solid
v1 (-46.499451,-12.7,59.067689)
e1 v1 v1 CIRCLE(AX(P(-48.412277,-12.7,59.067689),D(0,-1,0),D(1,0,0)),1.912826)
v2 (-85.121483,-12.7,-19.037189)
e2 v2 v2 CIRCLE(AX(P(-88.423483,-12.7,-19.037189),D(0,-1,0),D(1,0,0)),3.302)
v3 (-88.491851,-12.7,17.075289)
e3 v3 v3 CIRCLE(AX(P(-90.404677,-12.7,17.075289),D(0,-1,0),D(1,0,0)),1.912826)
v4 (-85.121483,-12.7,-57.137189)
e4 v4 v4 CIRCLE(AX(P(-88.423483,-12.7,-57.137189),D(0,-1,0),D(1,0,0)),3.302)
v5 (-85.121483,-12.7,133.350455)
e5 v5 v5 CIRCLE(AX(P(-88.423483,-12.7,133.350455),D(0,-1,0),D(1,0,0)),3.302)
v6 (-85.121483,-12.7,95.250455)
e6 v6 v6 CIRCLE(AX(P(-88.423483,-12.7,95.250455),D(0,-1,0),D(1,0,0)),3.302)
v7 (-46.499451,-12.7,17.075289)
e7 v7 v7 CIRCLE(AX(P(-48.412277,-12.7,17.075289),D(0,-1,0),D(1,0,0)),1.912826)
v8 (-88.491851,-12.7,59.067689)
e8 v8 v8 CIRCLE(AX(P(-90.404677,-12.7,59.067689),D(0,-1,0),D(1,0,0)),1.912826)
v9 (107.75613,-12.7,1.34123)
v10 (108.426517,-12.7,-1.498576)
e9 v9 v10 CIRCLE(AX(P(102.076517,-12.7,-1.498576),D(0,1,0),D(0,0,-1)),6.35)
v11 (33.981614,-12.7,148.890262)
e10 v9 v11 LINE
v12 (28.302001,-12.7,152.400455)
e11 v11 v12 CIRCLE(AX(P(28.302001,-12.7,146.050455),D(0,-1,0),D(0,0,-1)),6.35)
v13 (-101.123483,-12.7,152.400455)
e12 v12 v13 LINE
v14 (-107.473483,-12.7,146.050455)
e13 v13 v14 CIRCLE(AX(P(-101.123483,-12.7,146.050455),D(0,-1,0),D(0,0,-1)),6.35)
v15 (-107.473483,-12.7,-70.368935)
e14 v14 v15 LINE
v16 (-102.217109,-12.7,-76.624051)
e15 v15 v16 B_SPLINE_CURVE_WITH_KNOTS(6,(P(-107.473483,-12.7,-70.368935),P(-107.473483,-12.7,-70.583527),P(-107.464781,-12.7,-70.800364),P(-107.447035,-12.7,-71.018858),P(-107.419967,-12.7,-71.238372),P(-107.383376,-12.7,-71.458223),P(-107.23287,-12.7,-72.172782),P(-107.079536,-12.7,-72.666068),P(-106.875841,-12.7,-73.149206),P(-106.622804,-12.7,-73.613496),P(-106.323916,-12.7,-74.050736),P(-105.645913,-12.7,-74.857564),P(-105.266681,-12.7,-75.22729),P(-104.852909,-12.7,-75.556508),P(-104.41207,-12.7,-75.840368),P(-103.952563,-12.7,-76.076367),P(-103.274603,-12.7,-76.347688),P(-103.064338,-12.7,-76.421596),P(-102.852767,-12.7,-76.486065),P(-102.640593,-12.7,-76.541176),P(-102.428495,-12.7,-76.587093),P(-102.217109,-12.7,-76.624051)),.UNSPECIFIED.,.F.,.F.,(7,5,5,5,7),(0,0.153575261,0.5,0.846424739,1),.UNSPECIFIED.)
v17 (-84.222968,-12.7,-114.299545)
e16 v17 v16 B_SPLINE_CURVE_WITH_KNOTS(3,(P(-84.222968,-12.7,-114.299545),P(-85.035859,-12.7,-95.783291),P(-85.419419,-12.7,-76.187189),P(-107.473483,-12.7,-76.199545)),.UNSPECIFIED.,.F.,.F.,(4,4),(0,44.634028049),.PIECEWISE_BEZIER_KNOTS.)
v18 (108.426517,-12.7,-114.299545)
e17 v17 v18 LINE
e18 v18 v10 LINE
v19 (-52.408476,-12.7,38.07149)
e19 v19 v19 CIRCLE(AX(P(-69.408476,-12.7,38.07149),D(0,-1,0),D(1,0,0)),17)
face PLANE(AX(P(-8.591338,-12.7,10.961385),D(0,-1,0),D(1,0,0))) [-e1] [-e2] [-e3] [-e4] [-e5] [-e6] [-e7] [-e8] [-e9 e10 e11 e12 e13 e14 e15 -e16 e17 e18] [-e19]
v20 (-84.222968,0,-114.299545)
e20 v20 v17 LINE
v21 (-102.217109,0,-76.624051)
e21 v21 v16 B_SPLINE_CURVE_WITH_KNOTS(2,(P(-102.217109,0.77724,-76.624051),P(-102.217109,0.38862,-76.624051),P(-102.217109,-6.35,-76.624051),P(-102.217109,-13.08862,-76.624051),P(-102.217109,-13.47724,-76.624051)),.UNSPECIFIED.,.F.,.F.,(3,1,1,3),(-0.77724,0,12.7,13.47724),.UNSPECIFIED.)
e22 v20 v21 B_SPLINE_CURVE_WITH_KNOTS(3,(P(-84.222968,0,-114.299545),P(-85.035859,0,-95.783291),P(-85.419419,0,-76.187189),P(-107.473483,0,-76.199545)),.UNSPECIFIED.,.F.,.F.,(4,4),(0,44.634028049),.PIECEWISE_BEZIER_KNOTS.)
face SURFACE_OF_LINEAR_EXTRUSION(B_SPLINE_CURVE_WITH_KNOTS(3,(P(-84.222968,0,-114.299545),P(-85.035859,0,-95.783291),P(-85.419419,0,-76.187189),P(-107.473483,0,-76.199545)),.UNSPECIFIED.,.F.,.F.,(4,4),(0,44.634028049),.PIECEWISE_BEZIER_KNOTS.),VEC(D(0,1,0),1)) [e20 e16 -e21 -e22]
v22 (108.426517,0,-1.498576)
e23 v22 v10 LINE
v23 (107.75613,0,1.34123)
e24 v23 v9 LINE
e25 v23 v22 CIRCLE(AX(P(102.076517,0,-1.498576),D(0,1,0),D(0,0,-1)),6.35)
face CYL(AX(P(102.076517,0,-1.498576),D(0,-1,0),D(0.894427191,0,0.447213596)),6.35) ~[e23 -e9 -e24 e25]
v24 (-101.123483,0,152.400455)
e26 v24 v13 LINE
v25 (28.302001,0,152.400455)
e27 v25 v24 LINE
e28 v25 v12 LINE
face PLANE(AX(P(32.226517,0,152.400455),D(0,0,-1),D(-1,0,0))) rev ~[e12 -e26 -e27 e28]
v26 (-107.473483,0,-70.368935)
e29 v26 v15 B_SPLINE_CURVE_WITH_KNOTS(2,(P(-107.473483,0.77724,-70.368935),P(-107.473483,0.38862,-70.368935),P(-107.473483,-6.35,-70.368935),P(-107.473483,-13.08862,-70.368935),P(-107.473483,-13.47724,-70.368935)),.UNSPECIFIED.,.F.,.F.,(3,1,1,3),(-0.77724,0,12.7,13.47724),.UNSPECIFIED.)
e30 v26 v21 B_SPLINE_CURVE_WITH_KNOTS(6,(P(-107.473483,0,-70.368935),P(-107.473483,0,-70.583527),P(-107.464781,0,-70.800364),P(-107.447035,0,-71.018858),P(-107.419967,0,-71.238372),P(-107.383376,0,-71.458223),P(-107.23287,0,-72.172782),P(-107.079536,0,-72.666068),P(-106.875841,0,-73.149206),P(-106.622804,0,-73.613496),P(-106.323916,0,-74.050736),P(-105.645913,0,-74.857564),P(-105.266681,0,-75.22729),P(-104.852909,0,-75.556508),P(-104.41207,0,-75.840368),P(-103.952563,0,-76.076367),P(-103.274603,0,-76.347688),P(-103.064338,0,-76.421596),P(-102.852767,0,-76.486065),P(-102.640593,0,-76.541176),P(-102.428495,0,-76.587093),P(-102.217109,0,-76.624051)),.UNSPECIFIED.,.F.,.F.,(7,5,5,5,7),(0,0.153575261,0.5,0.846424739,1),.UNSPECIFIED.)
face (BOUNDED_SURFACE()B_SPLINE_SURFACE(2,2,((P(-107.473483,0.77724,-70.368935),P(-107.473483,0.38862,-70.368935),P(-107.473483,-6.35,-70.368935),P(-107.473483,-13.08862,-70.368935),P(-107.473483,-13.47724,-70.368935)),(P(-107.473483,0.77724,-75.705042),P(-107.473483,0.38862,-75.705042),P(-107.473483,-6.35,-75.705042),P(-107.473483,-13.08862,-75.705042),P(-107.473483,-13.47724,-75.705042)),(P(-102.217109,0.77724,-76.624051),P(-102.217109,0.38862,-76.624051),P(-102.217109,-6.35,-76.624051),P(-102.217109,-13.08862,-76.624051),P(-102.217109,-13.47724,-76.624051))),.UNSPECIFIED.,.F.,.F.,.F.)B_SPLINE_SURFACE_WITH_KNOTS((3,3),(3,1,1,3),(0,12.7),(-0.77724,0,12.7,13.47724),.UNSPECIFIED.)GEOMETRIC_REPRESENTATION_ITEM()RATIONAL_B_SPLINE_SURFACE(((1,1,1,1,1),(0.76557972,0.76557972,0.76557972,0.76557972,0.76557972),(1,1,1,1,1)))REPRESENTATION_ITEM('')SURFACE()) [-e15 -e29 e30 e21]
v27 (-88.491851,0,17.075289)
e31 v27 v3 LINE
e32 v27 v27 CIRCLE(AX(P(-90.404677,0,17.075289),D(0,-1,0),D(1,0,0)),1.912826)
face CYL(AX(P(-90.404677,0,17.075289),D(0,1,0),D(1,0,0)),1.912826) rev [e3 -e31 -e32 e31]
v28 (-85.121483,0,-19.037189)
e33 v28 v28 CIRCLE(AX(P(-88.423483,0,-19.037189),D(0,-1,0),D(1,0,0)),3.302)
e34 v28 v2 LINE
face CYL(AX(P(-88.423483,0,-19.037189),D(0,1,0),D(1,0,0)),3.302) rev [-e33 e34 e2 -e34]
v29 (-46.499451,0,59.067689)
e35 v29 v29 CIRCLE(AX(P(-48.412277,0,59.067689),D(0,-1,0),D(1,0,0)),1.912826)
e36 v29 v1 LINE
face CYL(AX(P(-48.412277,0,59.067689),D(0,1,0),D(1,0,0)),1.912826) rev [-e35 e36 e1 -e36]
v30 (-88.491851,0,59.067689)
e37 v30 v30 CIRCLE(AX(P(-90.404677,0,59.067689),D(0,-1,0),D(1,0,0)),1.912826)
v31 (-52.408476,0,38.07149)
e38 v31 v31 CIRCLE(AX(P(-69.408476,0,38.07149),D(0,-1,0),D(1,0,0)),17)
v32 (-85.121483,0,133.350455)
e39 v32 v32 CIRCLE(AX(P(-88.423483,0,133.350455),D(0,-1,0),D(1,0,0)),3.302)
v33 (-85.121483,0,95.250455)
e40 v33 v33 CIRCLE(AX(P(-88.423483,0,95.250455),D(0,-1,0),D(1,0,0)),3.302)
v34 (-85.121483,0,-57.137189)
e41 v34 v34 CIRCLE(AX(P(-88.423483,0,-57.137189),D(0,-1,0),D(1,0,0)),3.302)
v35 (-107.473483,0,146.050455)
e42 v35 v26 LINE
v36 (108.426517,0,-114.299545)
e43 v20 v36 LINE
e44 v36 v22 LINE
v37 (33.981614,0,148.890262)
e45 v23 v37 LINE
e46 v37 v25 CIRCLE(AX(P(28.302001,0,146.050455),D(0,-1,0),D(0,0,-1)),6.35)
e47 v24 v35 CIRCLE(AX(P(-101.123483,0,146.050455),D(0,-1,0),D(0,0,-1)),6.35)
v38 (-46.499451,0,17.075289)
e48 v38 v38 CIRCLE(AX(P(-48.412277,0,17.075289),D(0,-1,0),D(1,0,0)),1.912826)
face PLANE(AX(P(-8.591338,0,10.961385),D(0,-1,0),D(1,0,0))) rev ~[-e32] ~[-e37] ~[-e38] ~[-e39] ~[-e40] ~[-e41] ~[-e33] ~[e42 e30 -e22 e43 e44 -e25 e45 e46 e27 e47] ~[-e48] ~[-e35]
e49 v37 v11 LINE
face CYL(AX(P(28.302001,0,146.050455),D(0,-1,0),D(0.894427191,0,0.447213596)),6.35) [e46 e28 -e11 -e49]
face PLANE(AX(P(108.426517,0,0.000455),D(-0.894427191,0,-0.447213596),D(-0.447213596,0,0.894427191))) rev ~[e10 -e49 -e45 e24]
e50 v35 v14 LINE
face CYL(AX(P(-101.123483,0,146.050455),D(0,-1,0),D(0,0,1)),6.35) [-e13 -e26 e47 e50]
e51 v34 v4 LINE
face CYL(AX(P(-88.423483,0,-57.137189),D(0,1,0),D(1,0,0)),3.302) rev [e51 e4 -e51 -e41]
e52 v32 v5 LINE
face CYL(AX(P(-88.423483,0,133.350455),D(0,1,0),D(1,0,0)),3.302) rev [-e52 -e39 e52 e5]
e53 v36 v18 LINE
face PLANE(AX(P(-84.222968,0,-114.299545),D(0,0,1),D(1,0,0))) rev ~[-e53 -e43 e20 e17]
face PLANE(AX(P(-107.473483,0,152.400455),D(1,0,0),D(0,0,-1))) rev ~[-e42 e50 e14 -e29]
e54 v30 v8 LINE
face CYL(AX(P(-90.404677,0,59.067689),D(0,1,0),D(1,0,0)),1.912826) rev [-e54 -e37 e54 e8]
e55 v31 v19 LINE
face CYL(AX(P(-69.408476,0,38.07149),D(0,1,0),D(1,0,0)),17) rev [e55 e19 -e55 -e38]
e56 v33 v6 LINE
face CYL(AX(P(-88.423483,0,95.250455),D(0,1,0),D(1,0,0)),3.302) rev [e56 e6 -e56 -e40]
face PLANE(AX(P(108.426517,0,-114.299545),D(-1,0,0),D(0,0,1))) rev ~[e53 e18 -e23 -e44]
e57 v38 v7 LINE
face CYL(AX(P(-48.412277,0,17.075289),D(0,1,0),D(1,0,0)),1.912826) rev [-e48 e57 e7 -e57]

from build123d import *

# Parameters (mm, degrees)
F0_R     = 3.302
F0_W     = 52
F0_H     = 52
F0_R_2   = 1.9128263044
F0_R_3   = 17
F1_DEPTH = 12.7
F2_DEPTH = 25.4
F3_R     = 6.35


with BuildPart() as f1:
    # F0 (on Front) → F1 (new body)
    with BuildSketch(Plane.XZ):
        with BuildLine():
            Line((108.4265169831, 0.0004552842), (32.2265169831, 152.4004552842))
            Line((32.2265169831, 152.4004552842), (-107.4734830169, 152.4004552842))
            Line((-107.4734830169, 152.4004552842), (-107.4734830169, -76.1995447158))
            add(Edge.make_bspline(
                [(-84.2229677556, -114.2995447158), (-85.0358593396, -95.7832909802), (-85.4194185281, -76.1871889735), (-107.4734830169, -76.1995447158)],
                knots=[0, 0, 0, 0, 44.6340280494, 44.6340280494, 44.6340280494, 44.6340280494], degree=3))
            Line((-84.2229677556, -114.2995447158), (108.4265169831, -114.2995447158))
            Line((108.4265169831, -114.2995447158), (108.4265169831, 0.0004552842))
        make_face()
        with Locations((-88.4234830169, -57.1371889735)):
            Circle(F0_R, mode=Mode.SUBTRACT)
        with Locations((-88.4234830169, -19.0371889735)):
            Circle(F0_R, mode=Mode.SUBTRACT)
        with Locations((-69.4084768891, 38.0714893565)):
            Rectangle(F0_W, F0_H, mode=Mode.SUBTRACT)
        with Locations((-88.4234830169, 95.2504552842)):
            Circle(F0_R, mode=Mode.SUBTRACT)
        with Locations((-88.4234830169, 133.3504552842)):
            Circle(F0_R, mode=Mode.SUBTRACT)
        with Locations((-69.4084768891, 38.0714893565)):
            Rectangle(F0_W, F0_H)
        with Locations((-90.4046768891, 17.0752893565)):
            Circle(F0_R_2, mode=Mode.SUBTRACT)
        with Locations((-48.4122768891, 17.0752893565)):
            Circle(F0_R_2, mode=Mode.SUBTRACT)
        with Locations((-69.4084763527, 38.0714898929)):
            Circle(F0_R_3, mode=Mode.SUBTRACT)
        with Locations((-90.4046768891, 59.0676893565)):
            Circle(F0_R_2, mode=Mode.SUBTRACT)
        with Locations((-48.4122768891, 59.0676893565)):
            Circle(F0_R_2, mode=Mode.SUBTRACT)
    extrude(amount=F1_DEPTH)

    # F0 (on Front) → F2 (cut)
    with BuildSketch(Plane.XZ):
        with BuildLine():
            Line((108.4265169831, 0.0004552842), (32.2265169831, 152.4004552842))
            Line((32.2265169831, 152.4004552842), (-107.4734830169, 152.4004552842))
            Line((-107.4734830169, 152.4004552842), (-107.4734830169, -76.1995447158))
            add(Edge.make_bspline(
                [(-84.2229677556, -114.2995447158), (-85.0358593396, -95.7832909802), (-85.4194185281, -76.1871889735), (-107.4734830169, -76.1995447158)],
                knots=[0, 0, 0, 0, 44.6340280494, 44.6340280494, 44.6340280494, 44.6340280494], degree=3))
            Line((-84.2229677556, -114.2995447158), (108.4265169831, -114.2995447158))
            Line((108.4265169831, -114.2995447158), (108.4265169831, 0.0004552842))
        make_face()
        with Locations((-88.4234830169, -57.1371889735)):
            Circle(F0_R, mode=Mode.SUBTRACT)
        with Locations((-88.4234830169, -19.0371889735)):
            Circle(F0_R, mode=Mode.SUBTRACT)
        with Locations((-69.4084768891, 38.0714893565)):
            Rectangle(F0_W, F0_H, mode=Mode.SUBTRACT)
        with Locations((-88.4234830169, 95.2504552842)):
            Circle(F0_R, mode=Mode.SUBTRACT)
        with Locations((-88.4234830169, 133.3504552842)):
            Circle(F0_R, mode=Mode.SUBTRACT)
    extrude(amount=-F2_DEPTH, mode=Mode.SUBTRACT)

    # F3
    f3_edges = [f1.edges().sort_by_distance(p)[0] for p in [
        (-107.473483, -6.35, 152.400455),
        (-107.473483, -6.35, -76.199545),
        (108.426517, -6.35, 0.000455),
        (32.226517, -6.35, 152.400455),
    ]]
    fillet(f3_edges, radius=F3_R)


solid = f1.part
